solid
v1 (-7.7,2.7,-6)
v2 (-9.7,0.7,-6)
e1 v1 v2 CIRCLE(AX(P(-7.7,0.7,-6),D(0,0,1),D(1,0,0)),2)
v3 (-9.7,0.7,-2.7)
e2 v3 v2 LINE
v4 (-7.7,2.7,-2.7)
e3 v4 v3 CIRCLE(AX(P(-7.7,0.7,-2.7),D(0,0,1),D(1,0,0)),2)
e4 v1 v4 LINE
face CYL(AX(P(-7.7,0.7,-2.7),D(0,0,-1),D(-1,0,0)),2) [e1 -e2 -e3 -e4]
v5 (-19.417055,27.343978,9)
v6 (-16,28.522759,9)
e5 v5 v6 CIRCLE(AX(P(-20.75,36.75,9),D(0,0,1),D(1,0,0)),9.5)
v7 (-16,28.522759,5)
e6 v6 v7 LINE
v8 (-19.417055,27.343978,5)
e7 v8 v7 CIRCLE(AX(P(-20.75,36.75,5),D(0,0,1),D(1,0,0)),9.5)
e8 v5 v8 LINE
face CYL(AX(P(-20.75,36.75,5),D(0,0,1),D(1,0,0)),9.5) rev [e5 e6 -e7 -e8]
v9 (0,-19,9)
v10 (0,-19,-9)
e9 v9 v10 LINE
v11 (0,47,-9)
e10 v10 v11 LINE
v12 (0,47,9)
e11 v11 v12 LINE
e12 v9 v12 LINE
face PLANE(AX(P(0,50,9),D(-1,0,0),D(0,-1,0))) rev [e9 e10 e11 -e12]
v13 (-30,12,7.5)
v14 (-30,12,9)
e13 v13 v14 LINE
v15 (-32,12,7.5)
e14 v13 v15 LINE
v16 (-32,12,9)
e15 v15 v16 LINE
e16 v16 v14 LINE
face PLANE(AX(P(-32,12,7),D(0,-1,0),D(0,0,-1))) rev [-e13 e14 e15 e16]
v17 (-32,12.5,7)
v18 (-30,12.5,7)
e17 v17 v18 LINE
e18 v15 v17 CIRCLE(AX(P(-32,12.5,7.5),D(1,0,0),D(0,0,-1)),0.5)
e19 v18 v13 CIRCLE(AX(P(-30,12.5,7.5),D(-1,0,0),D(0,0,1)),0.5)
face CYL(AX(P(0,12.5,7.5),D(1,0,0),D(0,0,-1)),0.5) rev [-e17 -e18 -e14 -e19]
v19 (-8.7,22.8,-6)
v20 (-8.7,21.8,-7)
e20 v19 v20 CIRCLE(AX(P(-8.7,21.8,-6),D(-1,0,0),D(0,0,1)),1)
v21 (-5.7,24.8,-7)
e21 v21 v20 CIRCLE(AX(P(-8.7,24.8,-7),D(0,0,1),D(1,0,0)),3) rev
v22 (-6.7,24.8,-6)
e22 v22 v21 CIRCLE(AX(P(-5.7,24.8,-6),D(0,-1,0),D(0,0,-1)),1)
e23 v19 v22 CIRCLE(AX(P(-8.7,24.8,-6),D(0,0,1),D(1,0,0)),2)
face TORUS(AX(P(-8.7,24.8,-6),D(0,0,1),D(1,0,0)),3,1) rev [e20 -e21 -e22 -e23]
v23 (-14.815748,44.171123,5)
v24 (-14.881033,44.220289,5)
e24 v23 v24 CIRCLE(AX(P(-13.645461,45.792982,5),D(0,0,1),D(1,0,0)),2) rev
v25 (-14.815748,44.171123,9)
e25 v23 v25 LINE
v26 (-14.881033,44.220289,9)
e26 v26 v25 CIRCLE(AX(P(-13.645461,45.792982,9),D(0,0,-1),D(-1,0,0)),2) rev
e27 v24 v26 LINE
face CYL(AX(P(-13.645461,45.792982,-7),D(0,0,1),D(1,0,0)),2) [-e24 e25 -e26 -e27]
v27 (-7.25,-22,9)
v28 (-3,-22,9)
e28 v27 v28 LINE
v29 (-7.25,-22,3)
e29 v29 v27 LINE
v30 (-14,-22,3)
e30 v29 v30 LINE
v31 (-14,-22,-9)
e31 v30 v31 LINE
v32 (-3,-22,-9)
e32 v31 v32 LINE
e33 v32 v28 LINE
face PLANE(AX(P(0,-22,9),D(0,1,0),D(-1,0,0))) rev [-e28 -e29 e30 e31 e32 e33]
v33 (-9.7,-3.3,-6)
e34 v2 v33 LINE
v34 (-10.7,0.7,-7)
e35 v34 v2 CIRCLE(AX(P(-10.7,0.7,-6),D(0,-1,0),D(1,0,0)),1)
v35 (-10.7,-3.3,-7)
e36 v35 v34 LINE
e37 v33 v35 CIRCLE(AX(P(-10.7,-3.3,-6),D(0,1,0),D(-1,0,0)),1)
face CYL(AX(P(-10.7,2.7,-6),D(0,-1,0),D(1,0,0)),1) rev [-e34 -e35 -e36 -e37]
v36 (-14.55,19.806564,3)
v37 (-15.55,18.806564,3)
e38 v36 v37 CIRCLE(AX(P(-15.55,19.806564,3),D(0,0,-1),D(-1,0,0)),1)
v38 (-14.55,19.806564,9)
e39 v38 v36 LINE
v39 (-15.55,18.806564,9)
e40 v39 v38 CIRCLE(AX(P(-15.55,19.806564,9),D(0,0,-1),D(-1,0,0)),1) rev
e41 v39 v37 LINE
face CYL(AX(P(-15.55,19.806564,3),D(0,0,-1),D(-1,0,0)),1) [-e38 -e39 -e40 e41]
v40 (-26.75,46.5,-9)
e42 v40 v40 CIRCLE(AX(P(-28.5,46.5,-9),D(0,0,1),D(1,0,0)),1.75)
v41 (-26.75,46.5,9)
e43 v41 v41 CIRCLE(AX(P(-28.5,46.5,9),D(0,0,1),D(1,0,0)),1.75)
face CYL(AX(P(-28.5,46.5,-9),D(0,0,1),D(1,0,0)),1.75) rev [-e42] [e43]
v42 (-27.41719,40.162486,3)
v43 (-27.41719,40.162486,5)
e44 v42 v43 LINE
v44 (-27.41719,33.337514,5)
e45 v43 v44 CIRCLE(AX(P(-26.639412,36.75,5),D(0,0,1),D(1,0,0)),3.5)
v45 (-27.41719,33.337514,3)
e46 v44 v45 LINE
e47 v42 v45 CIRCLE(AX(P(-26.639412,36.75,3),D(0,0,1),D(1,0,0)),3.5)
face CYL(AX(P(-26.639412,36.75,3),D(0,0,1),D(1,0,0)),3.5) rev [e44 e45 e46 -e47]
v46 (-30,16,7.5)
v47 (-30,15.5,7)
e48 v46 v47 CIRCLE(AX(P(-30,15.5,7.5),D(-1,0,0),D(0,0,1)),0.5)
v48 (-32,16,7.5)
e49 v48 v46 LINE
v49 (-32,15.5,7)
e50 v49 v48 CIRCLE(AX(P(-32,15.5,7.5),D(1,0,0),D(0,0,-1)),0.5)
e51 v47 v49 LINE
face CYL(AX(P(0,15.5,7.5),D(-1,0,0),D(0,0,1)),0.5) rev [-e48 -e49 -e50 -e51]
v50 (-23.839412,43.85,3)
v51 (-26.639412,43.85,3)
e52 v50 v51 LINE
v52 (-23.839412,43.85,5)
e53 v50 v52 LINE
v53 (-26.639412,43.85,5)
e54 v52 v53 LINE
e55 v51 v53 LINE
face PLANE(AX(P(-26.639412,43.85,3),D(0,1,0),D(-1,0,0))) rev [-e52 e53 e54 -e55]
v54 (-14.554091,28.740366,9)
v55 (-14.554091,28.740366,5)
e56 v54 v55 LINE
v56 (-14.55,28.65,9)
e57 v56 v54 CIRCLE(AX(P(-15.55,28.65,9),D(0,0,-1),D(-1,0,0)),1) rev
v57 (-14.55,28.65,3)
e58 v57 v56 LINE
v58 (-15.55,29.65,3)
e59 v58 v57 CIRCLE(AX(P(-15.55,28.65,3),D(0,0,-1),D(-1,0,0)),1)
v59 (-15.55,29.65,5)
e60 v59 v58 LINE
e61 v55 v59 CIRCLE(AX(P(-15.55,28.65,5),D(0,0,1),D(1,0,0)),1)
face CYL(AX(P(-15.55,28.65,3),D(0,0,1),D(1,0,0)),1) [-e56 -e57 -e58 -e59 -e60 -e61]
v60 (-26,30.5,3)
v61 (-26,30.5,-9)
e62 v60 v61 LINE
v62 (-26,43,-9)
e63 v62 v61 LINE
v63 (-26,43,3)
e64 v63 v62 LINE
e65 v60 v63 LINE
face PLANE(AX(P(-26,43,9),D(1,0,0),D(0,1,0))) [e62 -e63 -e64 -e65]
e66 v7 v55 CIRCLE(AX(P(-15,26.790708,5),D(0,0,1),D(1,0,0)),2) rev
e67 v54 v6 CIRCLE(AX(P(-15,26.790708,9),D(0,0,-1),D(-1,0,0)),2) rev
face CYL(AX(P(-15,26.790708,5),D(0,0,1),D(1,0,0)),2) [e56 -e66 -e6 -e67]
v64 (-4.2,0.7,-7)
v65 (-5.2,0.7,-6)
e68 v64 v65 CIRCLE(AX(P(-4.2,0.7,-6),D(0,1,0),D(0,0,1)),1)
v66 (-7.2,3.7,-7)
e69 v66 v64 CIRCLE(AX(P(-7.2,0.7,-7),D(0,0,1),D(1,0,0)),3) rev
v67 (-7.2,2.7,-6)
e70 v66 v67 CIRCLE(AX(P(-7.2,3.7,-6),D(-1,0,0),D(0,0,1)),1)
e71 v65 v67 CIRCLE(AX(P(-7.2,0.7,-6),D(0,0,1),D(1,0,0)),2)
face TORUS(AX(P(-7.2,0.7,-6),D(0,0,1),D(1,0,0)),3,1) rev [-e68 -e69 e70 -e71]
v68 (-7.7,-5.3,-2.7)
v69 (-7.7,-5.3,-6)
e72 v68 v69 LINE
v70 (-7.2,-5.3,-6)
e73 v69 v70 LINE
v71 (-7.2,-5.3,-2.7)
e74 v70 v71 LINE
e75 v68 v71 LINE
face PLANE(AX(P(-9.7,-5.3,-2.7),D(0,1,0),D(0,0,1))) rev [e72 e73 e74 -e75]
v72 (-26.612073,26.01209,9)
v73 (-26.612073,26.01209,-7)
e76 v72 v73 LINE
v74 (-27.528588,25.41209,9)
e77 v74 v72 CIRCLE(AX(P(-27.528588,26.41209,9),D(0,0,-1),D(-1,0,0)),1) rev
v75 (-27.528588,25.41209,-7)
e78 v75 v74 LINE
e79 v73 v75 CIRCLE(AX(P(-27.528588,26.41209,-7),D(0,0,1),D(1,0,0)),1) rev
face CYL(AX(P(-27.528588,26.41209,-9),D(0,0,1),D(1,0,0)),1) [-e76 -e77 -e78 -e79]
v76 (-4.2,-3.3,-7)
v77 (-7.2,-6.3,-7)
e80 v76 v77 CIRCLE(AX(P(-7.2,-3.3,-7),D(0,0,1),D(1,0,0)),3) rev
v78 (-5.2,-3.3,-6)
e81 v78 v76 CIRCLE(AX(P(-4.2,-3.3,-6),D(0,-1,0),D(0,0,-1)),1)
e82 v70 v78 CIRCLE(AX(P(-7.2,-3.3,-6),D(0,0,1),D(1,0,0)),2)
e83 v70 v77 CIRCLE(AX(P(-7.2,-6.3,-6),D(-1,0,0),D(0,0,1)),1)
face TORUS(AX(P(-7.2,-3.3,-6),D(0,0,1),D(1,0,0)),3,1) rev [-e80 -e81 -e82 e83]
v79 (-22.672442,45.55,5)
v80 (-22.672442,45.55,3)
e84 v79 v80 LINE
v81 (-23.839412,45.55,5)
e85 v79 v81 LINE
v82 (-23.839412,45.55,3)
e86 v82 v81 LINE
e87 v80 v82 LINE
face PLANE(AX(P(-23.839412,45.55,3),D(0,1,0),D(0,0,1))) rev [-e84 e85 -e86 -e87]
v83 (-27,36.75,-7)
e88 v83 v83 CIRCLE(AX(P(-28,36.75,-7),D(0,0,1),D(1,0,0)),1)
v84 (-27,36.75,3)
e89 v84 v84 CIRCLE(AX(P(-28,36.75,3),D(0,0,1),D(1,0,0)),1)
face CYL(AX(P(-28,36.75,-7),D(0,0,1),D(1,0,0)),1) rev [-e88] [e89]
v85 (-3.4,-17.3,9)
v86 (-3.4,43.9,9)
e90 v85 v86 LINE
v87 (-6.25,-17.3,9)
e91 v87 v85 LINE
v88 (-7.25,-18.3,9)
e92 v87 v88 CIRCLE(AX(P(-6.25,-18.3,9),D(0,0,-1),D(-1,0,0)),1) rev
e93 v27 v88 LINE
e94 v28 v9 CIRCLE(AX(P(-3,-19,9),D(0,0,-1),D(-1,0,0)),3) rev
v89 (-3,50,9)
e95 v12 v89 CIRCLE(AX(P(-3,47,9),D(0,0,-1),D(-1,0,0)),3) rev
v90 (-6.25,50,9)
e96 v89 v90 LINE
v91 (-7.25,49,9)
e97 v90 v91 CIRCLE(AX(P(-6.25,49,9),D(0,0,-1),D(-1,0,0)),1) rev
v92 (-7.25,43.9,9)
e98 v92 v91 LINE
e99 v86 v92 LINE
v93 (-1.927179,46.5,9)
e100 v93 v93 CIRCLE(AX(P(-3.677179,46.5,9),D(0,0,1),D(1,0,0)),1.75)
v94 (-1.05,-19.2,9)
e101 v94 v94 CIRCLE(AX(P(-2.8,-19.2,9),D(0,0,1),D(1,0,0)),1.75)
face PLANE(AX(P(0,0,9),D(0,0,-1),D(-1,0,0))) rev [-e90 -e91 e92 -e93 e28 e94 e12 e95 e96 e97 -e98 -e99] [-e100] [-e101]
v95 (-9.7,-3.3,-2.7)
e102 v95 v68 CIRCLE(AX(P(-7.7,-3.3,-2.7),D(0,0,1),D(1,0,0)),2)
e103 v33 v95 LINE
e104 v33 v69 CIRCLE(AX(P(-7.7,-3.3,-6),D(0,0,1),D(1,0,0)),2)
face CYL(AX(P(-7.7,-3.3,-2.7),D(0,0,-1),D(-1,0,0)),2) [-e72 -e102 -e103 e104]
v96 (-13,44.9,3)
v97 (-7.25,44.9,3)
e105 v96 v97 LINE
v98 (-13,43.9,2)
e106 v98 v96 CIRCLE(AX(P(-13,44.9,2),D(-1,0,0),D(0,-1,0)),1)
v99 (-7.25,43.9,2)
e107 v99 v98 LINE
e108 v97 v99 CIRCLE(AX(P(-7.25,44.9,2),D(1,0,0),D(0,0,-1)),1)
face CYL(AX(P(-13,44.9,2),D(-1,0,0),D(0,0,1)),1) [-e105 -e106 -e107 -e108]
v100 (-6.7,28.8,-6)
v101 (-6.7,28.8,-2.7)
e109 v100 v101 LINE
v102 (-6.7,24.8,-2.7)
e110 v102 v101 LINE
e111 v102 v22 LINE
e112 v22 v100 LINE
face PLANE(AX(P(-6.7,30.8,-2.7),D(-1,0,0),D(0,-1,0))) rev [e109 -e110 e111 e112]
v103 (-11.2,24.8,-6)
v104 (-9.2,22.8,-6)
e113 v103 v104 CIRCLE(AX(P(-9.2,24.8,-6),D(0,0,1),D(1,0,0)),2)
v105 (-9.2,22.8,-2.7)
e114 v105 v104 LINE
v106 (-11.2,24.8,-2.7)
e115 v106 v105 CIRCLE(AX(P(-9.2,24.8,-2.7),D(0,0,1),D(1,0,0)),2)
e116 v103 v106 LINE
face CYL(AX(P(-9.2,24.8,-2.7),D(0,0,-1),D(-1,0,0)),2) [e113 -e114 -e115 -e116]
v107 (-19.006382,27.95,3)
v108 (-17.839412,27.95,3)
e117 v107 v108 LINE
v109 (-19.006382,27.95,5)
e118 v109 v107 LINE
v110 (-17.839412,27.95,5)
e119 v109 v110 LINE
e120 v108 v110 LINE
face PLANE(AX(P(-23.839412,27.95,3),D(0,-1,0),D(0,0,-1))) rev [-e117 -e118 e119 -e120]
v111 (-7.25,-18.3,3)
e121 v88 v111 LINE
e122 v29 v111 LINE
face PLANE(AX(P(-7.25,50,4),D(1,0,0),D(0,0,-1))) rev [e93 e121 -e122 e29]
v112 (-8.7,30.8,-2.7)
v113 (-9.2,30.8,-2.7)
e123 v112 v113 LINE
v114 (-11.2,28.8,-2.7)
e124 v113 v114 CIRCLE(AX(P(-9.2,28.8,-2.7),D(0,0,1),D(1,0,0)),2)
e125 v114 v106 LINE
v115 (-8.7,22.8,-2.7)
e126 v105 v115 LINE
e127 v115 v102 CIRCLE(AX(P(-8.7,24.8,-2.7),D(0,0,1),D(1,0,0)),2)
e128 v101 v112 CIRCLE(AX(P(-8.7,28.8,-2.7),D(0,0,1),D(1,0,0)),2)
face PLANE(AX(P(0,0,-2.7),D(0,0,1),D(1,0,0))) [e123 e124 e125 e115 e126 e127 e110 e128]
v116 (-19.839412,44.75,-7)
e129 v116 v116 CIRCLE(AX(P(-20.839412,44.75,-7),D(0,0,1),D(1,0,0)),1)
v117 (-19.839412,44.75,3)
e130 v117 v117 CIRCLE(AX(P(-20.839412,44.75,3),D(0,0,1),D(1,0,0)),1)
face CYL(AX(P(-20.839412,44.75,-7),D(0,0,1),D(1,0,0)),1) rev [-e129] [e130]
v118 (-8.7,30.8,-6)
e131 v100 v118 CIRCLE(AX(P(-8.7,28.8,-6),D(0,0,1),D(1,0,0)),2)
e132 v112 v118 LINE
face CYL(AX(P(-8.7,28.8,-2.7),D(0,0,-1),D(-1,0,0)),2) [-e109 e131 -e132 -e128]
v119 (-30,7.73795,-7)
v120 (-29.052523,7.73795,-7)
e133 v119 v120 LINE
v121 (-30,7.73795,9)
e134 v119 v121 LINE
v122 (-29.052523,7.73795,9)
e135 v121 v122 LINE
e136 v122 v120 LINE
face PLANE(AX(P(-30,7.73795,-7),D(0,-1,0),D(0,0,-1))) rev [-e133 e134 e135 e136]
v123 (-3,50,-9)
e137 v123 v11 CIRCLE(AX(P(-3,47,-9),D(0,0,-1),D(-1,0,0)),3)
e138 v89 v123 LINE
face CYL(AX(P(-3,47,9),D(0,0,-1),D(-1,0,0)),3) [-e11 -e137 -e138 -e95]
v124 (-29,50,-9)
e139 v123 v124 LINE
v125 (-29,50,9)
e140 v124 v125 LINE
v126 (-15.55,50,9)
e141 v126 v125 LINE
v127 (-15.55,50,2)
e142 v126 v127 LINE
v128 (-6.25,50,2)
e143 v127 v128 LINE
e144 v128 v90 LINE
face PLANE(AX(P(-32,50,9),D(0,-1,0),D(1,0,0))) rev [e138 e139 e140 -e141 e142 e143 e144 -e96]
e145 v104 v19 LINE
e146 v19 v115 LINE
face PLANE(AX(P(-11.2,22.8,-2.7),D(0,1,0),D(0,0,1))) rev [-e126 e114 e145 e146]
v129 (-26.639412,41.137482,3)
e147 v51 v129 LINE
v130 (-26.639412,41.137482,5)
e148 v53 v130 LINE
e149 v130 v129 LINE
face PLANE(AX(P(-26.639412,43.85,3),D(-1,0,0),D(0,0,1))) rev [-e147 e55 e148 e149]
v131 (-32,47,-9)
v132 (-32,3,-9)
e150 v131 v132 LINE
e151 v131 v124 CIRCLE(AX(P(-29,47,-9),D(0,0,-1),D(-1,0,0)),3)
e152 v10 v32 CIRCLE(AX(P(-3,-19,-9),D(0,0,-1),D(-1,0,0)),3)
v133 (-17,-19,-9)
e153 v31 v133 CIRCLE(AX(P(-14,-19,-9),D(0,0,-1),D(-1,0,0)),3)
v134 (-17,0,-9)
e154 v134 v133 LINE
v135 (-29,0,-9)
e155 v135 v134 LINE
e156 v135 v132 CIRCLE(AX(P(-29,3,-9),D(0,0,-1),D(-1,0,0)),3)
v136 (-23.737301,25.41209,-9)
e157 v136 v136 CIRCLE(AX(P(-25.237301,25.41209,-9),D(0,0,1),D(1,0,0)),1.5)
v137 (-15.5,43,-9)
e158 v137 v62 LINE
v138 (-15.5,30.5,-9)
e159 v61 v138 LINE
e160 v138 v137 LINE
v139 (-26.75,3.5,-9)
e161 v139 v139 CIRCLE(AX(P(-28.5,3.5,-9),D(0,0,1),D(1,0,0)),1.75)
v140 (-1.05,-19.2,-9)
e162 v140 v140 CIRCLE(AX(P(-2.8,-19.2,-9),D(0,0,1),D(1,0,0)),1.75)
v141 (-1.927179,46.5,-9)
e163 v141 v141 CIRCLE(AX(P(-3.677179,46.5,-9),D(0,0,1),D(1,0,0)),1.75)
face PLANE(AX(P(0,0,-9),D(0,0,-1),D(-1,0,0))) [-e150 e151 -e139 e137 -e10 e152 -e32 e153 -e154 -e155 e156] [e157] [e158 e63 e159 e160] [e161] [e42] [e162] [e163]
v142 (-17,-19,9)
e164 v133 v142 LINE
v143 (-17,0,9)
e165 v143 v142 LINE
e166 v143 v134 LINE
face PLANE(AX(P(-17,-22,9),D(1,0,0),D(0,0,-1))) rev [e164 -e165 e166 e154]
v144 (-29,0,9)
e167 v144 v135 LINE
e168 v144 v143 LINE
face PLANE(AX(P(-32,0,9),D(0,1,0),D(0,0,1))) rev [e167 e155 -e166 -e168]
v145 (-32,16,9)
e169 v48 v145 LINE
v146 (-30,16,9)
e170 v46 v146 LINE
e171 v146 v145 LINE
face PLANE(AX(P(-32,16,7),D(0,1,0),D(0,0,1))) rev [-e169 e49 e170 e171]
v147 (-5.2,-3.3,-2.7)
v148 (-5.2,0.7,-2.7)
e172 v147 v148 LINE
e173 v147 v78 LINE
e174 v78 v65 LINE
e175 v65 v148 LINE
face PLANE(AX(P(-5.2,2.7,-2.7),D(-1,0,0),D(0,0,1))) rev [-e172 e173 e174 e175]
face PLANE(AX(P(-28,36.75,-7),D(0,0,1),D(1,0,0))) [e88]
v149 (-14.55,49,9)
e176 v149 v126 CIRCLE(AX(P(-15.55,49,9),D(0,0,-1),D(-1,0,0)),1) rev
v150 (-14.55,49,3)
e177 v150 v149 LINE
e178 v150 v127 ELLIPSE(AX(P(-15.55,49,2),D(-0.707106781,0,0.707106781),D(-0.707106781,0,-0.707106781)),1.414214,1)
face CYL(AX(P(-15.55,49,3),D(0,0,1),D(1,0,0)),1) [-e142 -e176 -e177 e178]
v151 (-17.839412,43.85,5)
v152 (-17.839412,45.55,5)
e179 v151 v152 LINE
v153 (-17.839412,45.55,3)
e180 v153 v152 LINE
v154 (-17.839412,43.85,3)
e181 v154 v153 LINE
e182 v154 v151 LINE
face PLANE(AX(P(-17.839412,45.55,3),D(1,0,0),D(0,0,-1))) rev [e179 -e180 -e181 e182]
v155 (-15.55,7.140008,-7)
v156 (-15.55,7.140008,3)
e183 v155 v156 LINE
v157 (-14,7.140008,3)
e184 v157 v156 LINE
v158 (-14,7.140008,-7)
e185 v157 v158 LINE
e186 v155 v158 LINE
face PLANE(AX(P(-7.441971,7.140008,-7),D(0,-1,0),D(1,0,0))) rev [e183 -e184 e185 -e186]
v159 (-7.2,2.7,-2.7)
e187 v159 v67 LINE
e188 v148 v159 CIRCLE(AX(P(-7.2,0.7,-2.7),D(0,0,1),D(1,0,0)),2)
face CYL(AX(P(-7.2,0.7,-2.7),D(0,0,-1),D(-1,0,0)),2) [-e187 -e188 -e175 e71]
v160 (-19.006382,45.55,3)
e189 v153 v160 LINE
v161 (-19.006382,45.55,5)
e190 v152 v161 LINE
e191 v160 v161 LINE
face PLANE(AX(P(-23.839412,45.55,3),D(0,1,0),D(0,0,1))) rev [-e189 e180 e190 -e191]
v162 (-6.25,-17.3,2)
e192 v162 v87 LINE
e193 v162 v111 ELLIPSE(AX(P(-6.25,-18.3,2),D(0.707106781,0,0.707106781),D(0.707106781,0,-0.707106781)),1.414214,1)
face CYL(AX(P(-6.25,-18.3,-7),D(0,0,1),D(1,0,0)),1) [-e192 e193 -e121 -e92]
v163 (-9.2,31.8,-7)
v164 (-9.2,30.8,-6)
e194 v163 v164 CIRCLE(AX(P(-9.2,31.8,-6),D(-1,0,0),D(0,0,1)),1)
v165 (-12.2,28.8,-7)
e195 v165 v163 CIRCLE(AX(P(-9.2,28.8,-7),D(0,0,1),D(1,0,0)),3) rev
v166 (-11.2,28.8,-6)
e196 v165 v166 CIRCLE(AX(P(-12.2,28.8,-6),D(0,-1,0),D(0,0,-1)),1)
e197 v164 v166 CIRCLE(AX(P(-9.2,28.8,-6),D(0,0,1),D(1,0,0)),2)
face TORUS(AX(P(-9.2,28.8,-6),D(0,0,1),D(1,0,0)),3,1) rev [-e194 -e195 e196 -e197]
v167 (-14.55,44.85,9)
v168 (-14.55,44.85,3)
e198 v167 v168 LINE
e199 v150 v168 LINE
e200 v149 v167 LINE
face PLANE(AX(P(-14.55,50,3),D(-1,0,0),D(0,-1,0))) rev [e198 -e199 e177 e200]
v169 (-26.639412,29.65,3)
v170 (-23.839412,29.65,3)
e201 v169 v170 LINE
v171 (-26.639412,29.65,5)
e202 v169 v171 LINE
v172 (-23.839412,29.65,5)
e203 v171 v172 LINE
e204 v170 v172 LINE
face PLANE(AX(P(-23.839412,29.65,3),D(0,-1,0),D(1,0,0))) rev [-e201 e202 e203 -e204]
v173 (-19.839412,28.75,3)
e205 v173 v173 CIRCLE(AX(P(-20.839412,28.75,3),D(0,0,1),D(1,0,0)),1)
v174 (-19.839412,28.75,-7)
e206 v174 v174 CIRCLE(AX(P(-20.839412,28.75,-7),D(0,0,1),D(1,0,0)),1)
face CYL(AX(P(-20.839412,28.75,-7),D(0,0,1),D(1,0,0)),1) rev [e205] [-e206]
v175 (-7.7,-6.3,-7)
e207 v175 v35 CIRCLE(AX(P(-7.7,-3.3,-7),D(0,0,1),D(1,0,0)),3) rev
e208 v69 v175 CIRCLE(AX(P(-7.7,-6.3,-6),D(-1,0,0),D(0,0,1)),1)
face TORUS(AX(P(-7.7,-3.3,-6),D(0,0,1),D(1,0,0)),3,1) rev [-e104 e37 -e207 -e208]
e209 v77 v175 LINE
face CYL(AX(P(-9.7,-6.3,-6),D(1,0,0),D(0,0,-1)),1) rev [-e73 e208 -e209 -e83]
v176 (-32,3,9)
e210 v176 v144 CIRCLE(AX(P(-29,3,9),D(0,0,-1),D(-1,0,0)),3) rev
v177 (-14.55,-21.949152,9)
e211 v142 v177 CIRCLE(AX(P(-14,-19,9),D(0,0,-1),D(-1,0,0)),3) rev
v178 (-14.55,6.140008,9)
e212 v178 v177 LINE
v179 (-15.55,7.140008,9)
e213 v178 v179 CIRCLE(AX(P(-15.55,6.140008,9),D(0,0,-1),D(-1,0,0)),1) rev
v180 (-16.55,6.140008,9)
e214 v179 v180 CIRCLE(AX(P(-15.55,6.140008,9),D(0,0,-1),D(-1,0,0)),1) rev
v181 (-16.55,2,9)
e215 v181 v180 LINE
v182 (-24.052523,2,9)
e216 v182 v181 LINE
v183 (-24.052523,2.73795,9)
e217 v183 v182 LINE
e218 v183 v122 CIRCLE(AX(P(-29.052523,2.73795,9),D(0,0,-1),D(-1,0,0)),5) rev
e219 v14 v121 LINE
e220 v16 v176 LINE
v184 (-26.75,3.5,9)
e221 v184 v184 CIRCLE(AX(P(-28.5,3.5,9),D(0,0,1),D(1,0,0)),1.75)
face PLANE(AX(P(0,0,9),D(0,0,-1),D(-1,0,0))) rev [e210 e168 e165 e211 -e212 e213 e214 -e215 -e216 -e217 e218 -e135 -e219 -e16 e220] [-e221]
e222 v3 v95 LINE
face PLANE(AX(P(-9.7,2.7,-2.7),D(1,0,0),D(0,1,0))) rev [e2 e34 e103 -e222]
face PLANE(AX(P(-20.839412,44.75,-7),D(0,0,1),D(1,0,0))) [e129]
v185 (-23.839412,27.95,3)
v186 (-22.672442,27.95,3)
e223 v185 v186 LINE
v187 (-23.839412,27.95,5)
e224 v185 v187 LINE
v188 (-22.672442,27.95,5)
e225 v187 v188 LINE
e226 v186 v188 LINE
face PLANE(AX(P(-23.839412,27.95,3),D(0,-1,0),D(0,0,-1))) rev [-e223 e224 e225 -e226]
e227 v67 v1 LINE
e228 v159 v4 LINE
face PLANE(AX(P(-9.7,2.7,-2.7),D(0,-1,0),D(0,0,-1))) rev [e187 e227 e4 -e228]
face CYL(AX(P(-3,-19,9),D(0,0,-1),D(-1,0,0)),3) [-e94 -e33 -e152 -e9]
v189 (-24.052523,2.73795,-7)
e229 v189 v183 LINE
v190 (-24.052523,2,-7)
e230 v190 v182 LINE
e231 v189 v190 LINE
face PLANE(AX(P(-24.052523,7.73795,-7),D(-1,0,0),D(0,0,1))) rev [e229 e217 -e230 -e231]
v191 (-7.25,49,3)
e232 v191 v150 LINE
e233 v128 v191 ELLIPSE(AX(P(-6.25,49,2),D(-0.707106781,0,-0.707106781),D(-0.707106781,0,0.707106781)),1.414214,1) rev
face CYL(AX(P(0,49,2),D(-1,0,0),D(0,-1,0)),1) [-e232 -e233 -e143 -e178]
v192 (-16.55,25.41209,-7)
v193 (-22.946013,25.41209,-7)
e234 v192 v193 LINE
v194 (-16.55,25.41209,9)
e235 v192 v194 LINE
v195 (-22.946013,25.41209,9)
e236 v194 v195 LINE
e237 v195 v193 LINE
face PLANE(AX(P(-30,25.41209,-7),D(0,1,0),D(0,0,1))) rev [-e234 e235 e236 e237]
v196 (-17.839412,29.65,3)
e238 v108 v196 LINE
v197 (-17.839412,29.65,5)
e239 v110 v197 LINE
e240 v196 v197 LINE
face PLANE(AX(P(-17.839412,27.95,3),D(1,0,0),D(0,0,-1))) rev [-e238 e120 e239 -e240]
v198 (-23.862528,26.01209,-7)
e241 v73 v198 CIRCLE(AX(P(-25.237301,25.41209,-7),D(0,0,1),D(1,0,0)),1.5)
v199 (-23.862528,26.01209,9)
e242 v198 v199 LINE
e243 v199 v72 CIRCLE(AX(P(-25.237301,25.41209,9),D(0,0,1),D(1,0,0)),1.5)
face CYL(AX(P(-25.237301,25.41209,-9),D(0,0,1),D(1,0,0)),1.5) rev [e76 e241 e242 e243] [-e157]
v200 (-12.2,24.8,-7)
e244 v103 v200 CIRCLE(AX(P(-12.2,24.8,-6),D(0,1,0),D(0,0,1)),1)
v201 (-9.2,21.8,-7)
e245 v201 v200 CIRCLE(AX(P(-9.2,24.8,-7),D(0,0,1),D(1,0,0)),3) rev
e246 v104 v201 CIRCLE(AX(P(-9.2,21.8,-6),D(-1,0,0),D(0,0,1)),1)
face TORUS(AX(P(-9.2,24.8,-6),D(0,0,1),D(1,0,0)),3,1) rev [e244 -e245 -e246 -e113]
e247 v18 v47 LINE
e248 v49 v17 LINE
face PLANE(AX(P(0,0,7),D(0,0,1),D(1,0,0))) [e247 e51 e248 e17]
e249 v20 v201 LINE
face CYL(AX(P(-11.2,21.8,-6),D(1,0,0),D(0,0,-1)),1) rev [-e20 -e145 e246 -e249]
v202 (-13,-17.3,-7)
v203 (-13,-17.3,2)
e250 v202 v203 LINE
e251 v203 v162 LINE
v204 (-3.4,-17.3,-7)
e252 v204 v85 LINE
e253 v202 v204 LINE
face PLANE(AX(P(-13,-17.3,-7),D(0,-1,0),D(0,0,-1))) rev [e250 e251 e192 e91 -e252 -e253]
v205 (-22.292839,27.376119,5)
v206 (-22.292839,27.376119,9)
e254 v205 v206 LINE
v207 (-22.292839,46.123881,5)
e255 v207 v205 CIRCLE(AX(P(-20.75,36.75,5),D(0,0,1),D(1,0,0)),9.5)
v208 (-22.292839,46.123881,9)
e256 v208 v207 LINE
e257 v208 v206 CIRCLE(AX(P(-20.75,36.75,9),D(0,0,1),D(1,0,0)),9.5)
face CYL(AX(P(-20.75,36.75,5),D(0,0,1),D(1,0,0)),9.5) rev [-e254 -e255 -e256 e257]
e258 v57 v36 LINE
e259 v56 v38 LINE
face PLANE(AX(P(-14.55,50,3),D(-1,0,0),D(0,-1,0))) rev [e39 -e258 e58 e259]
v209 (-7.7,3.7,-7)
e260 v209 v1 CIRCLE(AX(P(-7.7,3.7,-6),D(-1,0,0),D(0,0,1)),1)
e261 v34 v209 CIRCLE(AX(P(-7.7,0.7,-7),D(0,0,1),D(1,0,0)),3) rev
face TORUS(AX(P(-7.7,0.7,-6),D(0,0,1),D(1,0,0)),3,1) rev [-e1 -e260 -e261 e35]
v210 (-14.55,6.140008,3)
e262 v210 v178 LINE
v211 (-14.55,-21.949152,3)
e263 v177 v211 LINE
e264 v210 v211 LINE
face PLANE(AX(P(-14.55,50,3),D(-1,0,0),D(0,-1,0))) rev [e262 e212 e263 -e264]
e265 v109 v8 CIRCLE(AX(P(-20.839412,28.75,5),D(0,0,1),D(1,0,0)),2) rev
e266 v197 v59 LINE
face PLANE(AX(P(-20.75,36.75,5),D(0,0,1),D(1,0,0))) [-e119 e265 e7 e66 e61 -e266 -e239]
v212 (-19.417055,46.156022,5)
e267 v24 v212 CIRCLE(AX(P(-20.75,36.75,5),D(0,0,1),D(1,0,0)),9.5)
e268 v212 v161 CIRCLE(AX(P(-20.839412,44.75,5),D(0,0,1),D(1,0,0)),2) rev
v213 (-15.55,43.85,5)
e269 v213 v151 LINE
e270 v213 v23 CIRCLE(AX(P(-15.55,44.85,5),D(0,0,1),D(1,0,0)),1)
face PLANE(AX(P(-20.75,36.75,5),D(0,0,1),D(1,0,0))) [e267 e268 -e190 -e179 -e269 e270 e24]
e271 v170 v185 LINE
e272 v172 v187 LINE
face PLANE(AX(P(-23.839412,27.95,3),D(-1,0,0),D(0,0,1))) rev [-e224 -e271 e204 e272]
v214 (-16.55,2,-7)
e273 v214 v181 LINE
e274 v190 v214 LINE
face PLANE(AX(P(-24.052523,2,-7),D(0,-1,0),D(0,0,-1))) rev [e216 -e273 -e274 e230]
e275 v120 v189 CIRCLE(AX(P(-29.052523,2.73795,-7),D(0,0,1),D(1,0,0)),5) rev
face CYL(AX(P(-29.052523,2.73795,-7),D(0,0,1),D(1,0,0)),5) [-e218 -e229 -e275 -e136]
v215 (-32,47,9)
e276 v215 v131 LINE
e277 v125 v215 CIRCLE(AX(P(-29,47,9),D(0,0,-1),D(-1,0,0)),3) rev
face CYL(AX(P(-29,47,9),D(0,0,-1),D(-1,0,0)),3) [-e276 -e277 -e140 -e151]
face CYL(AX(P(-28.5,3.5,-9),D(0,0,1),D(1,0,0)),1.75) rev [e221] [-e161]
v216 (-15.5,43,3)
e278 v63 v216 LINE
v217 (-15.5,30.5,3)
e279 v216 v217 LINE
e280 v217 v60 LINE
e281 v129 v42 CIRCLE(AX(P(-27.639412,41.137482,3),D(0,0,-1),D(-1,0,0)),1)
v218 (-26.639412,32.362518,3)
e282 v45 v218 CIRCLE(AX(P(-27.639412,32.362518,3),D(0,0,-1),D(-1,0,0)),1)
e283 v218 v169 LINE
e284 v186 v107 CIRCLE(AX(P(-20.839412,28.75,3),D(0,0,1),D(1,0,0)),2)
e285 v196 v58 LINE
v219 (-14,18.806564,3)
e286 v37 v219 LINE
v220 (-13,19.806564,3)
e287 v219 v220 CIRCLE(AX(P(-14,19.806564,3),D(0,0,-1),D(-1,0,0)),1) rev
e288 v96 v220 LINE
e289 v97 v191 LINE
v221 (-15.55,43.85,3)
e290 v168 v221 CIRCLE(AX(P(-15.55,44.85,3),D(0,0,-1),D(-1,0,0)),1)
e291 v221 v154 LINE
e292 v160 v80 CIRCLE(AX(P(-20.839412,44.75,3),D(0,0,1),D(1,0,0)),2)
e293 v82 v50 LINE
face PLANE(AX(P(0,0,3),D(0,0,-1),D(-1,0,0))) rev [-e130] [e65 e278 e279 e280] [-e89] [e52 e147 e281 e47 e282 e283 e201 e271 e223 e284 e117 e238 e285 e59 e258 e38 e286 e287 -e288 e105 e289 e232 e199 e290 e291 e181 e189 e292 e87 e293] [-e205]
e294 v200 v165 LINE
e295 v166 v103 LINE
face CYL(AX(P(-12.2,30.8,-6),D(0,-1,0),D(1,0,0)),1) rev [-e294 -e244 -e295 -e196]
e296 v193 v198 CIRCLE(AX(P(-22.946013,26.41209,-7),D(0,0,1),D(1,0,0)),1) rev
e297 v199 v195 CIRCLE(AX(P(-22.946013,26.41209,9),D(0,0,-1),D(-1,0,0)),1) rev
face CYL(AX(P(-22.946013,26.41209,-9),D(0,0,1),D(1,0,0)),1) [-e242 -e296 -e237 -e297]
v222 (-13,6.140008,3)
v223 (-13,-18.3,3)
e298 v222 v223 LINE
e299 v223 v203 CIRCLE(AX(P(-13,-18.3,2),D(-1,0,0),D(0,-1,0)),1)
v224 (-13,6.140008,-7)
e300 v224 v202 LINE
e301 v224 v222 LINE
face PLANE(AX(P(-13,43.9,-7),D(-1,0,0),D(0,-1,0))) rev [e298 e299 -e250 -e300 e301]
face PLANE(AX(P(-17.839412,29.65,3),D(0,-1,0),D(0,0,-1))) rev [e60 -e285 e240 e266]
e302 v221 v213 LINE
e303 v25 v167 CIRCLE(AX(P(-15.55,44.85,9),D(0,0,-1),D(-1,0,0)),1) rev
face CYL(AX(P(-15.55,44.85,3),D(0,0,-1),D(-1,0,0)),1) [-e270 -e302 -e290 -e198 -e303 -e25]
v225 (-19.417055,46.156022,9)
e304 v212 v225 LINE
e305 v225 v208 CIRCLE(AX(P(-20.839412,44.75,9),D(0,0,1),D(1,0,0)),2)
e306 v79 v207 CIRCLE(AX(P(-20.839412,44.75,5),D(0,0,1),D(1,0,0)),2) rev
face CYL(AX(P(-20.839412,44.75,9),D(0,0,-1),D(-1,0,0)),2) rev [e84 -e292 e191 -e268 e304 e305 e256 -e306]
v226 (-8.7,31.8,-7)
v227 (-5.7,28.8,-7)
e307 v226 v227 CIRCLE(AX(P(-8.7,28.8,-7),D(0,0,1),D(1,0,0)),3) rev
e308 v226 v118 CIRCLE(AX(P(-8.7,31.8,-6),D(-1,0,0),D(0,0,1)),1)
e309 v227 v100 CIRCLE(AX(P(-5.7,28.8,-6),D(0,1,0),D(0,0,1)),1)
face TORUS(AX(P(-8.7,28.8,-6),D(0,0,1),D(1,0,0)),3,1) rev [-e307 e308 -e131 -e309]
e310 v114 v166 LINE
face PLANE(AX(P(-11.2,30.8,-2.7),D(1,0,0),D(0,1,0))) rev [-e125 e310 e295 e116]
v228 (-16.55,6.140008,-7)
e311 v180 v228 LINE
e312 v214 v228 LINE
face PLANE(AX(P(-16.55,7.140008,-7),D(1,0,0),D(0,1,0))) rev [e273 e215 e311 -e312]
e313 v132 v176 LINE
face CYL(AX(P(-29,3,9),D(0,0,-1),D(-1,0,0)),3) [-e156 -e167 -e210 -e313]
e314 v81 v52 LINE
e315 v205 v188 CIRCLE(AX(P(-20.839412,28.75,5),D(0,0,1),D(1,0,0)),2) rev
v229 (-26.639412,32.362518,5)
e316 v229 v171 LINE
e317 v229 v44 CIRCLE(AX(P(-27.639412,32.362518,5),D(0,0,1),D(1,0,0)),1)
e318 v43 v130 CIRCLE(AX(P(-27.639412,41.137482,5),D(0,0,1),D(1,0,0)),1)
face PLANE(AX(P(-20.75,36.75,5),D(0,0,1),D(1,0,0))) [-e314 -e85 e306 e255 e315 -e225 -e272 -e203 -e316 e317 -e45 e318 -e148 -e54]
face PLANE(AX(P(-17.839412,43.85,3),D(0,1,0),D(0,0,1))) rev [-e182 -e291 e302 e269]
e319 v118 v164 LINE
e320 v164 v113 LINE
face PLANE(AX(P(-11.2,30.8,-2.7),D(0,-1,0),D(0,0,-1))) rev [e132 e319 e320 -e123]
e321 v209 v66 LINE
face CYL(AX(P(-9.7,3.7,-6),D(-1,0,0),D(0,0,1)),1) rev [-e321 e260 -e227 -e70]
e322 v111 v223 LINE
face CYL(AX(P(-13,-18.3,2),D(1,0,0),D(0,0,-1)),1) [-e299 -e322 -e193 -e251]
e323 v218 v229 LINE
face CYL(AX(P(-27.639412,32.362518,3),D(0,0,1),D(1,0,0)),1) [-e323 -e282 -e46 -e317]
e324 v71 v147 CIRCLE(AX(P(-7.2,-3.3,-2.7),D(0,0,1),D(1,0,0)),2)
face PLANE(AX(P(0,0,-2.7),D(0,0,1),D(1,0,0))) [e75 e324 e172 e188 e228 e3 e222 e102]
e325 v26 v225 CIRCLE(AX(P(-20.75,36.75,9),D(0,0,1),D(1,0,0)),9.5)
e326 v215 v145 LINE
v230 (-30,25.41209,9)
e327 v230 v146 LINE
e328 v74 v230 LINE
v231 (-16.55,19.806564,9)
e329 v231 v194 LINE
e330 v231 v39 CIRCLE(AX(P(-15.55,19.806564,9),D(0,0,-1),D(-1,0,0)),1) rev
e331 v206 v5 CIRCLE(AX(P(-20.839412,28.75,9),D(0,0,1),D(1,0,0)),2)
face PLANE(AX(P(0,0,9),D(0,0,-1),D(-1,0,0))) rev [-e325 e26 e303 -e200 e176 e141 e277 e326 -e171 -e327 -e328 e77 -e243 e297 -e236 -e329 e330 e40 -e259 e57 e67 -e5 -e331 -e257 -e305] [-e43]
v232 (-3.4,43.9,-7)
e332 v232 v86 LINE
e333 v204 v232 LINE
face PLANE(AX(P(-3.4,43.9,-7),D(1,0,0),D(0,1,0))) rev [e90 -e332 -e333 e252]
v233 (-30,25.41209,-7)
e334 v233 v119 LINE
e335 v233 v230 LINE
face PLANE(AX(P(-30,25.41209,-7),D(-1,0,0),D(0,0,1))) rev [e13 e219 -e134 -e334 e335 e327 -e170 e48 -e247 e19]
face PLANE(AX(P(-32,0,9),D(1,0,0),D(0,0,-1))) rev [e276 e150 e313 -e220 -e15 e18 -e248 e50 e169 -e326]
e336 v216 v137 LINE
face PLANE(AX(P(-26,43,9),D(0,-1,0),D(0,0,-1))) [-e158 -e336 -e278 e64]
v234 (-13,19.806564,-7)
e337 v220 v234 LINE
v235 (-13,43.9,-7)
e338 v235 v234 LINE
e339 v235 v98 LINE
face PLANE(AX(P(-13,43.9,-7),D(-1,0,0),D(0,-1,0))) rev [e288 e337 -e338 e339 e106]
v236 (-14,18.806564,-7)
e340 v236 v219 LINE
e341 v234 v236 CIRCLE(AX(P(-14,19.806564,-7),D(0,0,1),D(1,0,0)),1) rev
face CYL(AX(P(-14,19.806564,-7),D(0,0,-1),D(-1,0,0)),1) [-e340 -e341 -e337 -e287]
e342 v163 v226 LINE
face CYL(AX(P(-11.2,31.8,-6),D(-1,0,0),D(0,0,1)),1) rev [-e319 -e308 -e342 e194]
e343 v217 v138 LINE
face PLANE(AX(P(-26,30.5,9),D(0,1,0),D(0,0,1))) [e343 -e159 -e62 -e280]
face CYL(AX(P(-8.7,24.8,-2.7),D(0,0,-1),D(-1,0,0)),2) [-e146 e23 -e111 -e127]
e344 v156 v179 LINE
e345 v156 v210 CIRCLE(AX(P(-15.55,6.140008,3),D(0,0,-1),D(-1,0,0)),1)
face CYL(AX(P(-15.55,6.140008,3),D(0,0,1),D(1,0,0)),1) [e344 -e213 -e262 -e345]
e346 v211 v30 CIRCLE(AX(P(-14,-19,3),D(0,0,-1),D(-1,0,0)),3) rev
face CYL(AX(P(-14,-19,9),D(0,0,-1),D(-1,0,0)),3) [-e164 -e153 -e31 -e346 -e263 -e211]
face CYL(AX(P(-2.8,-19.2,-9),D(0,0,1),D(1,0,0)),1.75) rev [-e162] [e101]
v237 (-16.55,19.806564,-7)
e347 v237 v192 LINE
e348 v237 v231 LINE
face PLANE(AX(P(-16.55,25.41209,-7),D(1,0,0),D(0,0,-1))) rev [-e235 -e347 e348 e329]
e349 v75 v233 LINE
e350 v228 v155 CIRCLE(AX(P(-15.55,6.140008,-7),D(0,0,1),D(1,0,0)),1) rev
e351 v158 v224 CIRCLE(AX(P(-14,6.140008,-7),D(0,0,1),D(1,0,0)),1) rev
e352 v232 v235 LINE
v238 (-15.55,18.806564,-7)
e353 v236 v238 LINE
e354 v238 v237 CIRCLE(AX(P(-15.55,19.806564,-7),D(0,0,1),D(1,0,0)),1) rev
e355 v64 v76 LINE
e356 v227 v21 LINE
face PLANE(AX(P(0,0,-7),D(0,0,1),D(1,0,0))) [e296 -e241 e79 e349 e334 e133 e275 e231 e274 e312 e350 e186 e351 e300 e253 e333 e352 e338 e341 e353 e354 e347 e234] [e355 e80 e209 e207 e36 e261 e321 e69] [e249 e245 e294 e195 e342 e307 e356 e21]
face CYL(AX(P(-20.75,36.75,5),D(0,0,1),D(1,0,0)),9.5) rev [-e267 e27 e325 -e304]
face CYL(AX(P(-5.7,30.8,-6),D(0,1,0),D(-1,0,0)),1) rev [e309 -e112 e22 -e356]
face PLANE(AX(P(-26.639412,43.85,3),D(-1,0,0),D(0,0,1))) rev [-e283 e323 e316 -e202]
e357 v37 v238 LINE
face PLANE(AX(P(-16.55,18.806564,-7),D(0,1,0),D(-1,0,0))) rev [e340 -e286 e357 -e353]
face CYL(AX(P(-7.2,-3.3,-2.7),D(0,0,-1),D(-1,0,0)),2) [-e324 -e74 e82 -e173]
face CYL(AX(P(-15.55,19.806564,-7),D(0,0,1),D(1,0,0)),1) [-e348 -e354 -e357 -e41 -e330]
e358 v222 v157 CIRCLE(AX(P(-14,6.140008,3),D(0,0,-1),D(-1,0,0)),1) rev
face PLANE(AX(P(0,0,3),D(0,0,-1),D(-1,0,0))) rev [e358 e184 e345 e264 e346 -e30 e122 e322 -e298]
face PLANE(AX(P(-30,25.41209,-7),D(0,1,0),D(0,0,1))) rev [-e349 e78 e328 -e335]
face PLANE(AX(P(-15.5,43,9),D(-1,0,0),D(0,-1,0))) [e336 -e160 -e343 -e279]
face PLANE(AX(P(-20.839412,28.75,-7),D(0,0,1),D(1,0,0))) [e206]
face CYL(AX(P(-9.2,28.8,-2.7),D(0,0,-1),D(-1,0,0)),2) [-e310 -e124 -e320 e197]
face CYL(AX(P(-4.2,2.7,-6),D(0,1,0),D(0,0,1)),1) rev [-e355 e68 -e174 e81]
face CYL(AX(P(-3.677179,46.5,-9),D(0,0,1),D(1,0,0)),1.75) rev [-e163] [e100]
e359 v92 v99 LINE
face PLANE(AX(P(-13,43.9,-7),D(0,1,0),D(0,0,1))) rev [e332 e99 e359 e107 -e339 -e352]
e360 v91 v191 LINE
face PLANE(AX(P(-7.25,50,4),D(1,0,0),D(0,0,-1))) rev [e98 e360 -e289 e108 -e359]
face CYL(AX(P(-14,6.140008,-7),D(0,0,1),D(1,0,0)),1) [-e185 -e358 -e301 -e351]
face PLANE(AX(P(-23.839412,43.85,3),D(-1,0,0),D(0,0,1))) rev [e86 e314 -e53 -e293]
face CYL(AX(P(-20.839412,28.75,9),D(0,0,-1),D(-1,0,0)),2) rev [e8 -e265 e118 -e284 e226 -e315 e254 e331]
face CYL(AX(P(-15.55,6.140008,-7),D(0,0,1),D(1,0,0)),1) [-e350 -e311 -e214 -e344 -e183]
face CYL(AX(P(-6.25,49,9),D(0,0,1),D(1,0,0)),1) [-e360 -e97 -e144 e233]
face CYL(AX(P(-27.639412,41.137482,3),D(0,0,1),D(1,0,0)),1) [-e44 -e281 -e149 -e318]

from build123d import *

# Parameters (mm, degrees)
BODY_SKETCH_W                        = 10.5
BODY_SKETCH_H                        = 12.5
BODY_DEPTH                           = 9
GEAR_BOX_R                           = 9.5
GEAR_PROFILE_DEPTH                   = 4
SCREWHOLE1_R                         = 1.75
SCREW1_DEPTH                         = 63.032249677
VERRUNDUNG2_R                        = 3
GLIDER_W                             = 9.6
GLIDER_H                             = 61.2
GLIDER_RUT_DEPTH                     = 16
VERRUNDUNG4_R                        = 2
HOLDER_OF_GLIDER_W                   = 4.5
HOLDER_OF_GLIDER_H                   = 8
GLIDER_HOLDER_DEPTH                  = 4.3
VERRUNDUNG5_R                        = 2
VERRUNDUNG6_R                        = 1
VERRUNDUNG7_R                        = 1
PINION_RUT_W                         = 4.5
PINION_RUT_H                         = 72
PINION_RUT_CUT_DEPTH                 = 5
VERRUNDUNG8_R                        = 2
SKETCH_PINION_CHANNEL_W              = 7.3
SKETCH_PINION_CHANNEL_H              = 75
PINION_CHANNEL_DEPTH                 = 6
VERRUNDUNG10_R                       = 1
VERRUNDUNG11_R                       = 1
MOTOR_HOLDER_DEPTH                   = 2
SKIZZE1_R                            = 1
MOTOR_SCREW_DEPTH                    = 10
SCHNITT_LINEAR_AUSTRAGEN2_DEPTH      = 61.991802728
SCHNITT_LINEAR_AUSTRAGEN2_DEPTH_BACK = 2
SKIZZE2_R                            = 2
SCHNITT_LINEAR_AUSTRAGEN3_DEPTH      = 2
VERRUNDUNG12_R                       = 1
VERRUNDUNG13_R                       = 1
LEFT_HOLE_R                          = 1
CENTER_HOLE_LEFT_DEPTH               = 10
ELECTRO_CAGE_DEPTH                   = 16
SKIZZE6_R                            = 1.5
SCHNITT_LINEAR_AUSTRAGEN5_DEPTH      = 18
SKIZZE7_R                            = 1.75
SCHNITT_LINEAR_AUSTRAGEN6_DEPTH      = 18
VERRUNDUNG14_R                       = 3
VERRUNDUNG15_R                       = 5
VERRUNDUNG16_R                       = 1
VERRUNDUNG17_R                       = 1
VERRUNDUNG18_R                       = 1
VERRUNDUNG19_R                       = 1
VERRUNDUNG20_R                       = 1
VERRUNDUNG21_R                       = 3
SKIZZE8_W                            = 2
SKIZZE8_H                            = 4
SCHNITT_LINEAR_AUSTRAGEN7_DEPTH      = 2
VERRUNDUNG22_R                       = 0.5


# Some blends are built 0.0001 mm under size
with BuildPart() as part:
    # body-sketch → body (new, symmetric)
    with BuildSketch(Plane.XY):
        Polygon((-32, 50), (0, 50), (0, -22), (-17, -22), (-17, 0), (-32, 0), align=None)
        with Locations((-20.75, 36.75)):
            Rectangle(BODY_SKETCH_W, BODY_SKETCH_H, mode=Mode.SUBTRACT)
    extrude(amount=BODY_DEPTH, both=True)

    # gear_box → gear_profile (cut)
    with BuildSketch(Plane.XY.offset(9)):
        with Locations((-20.75, 36.75)):
            Circle(GEAR_BOX_R)
    extrude(amount=-GEAR_PROFILE_DEPTH, mode=Mode.SUBTRACT)

    # screwhole1 → screw1 (cut, through all)
    with BuildSketch(Plane.XY.offset(9)):
        with Locations((-28.5, 46.5)):
            Circle(SCREWHOLE1_R)
        with Locations((-3.677178533, 46.5)):
            Circle(SCREWHOLE1_R)
        with Locations((-2.8, -19.2)):
            Circle(SCREWHOLE1_R)
    extrude(amount=-SCREW1_DEPTH, mode=Mode.SUBTRACT)

    # Verrundung2
    verrundung2_edges = [part.edges().sort_by_distance(p)[0] for p in [
        (-32, 50, 0),
        (0, 50, 0),
    ]]
    fillet(verrundung2_edges, radius=VERRUNDUNG2_R)

    # glider → glider_rut (cut)
    with BuildSketch(Plane.XY.offset(9)):
        with Locations((-8.2, 13.3)):
            Rectangle(GLIDER_W, GLIDER_H)
    extrude(amount=-GLIDER_RUT_DEPTH, mode=Mode.SUBTRACT)

    # Verrundung4
    verrundung4_edges = [part.edges().sort_by_distance(p)[0] for p in [
        (-13, 31.255684756, 7),
    ]]
    fillet(verrundung4_edges, radius=VERRUNDUNG4_R)

    # holder of glider → glider-holder (add)
    with BuildSketch(Plane.XY.offset(-7)):
        with Locations((-8.95, 26.8)):
            Rectangle(HOLDER_OF_GLIDER_W, HOLDER_OF_GLIDER_H)
        with Locations((-7.45, -1.3)):
            Rectangle(HOLDER_OF_GLIDER_W, HOLDER_OF_GLIDER_H)
    extrude(amount=GLIDER_HOLDER_DEPTH)

    # Verrundung5
    verrundung5_edges = [part.edges().sort_by_distance(p)[0] for p in [
        (-6.7, 22.8, -4.85),
        (-6.7, 30.8, -4.85),
        (-11.2, 30.8, -4.85),
        (-11.2, 22.8, -4.85),
        (-5.2, -5.3, -4.85),
        (-5.2, 2.7, -4.85),
        (-9.7, 2.7, -4.85),
        (-9.7, -5.3, -4.85),
    ]]
    fillet(verrundung5_edges, radius=VERRUNDUNG5_R)

    # Verrundung6
    verrundung6_edges = [part.edges().sort_by_distance(p)[0] for p in [
        (-11.2, 26.8, -7),
        (-8.95, 30.8, -7),
        (-6.7, 26.8, -7),
        (-8.95, 22.8, -7),
        (-10.614213562, 30.214213562, -7),
        (-7.285786438, 30.214213562, -7),
        (-7.285786438, 23.385786438, -7),
        (-10.614213562, 23.385786438, -7),
    ]]
    fillet(verrundung6_edges, radius=VERRUNDUNG6_R)

    # Verrundung7
    verrundung7_edges = [part.edges().sort_by_distance(p)[0] for p in [
        (-7.45, -5.3, -7),
        (-9.7, -1.3, -7),
        (-5.2, -1.3, -7),
        (-7.45, 2.7, -7),
        (-9.114213562, -4.714213562, -7),
        (-5.785786438, -4.714213562, -7),
        (-5.785786438, 2.114213562, -7),
        (-9.114213562, 2.114213562, -7),
    ]]
    fillet(verrundung7_edges, radius=VERRUNDUNG7_R)

    # Pinion rut → pinion rut cut (cut)
    with BuildSketch(Plane.XY.offset(9)):
        with Locations((-9.5, 14)):
            Rectangle(PINION_RUT_W, PINION_RUT_H)
    extrude(amount=-PINION_RUT_CUT_DEPTH, mode=Mode.SUBTRACT)

    # Verrundung8
    # the kernel refuses this fillet: 2 mm, written as the material it takes off along each edge
    with BuildSketch(Plane(origin=(-13, 42.244315244, 5), x_dir=(0, 1, 0), z_dir=(0, 0, 1))) as verrundung8_piece_1:
        with BuildLine():
            CenterArc((3.548666653, 0.645460718), VERRUNDUNG8_R, 141.845362101, 56.982763935)
            Line((1.975974149, 1.881032767), (1.944520299, 1.905744208))
            ThreePointArc((1.944520299, 1.905744208), (1.028281735, 0.89818793), (-0.023133959, 0.032631579))
            Line((-0.023133959, 0.032631579), (0, -0.04))
            ThreePointArc((0, -0.04), (0.827842378, -0.04), (1.617825118, -0.012909214))
            Line((1.617825118, -0.012909214), (1.655684756, 0))
        make_face()
    extrude(amount=10.820354696, mode=Mode.SUBTRACT)

    # sketch pinion channel → pinion channel (cut)
    with BuildSketch(Plane.XY.offset(9)):
        with Locations((-10.9, 12.5)):
            Rectangle(SKETCH_PINION_CHANNEL_W, SKETCH_PINION_CHANNEL_H)
    extrude(amount=-PINION_CHANNEL_DEPTH, mode=Mode.SUBTRACT)

    # Verrundung10
    verrundung10_edges = [part.edges().sort_by_distance(p)[0] for p in [
        (-7.25, -17.3, 6),
        (-7.25, 50, 6),
        (-14.55, 50, 6),
    ]]
    fillet(verrundung10_edges, radius=VERRUNDUNG10_R)

    # Verrundung11
    verrundung11_edges = [part.edges().sort_by_distance(p)[0] for p in [
        (-10.125, 43.9, 3),
        (-9.625, -17.3, 3),
        (-10.9, 50, 3),
    ]]
    fillet(verrundung11_edges, radius=VERRUNDUNG11_R)

    # motor-holder 2 → motor -holder (cut)
    with BuildSketch(Plane.XY.offset(5)):
        Polygon((-14.33941219, 43.85), (-14.33941219, 29.65), (-17.83941219, 29.65), (-17.83941219, 27.95), (-23.83941219, 27.95), (-23.83941219, 29.65), (-26.63941219, 29.65), (-26.63941219, 43.85), (-23.83941219, 43.85), (-23.83941219, 45.55), (-17.83941219, 45.55), (-17.83941219, 43.85), align=None)
    extrude(amount=-MOTOR_HOLDER_DEPTH, mode=Mode.SUBTRACT)

    # Skizze1 → motor-screw (cut)
    with BuildSketch(Plane.XY.offset(3)):
        with Locations((-20.83941219, 28.75)):
            Circle(SKIZZE1_R)
        with Locations((-20.83941219, 44.75)):
            Circle(SKIZZE1_R)
    extrude(amount=-MOTOR_SCREW_DEPTH, mode=Mode.SUBTRACT)

    # Skizze2 → Schnitt-Linear austragen2 (cut, two sides: drawn at the far end of the back side and taken through both)
    with BuildSketch(Plane.XY.offset(5).offset(-SCHNITT_LINEAR_AUSTRAGEN2_DEPTH_BACK)):
        with Locations((-20.83941219, 44.75)):
            Circle(SKIZZE2_R)
        with Locations((-20.83941219, 28.75)):
            Circle(SKIZZE2_R)
    extrude(amount=SCHNITT_LINEAR_AUSTRAGEN2_DEPTH + SCHNITT_LINEAR_AUSTRAGEN2_DEPTH_BACK, mode=Mode.SUBTRACT)

    # Skizze3 → Schnitt-Linear austragen3 (cut)
    with BuildSketch(Plane.XY.offset(5)):
        with BuildLine():
            Line((-26.63941219, 40.25), (-26.63941219, 33.25))
            ThreePointArc((-26.63941219, 33.25), (-30.13941219, 36.75), (-26.63941219, 40.25))
        make_face()
    extrude(amount=-SCHNITT_LINEAR_AUSTRAGEN3_DEPTH, mode=Mode.SUBTRACT)

    # Verrundung12
    verrundung12_edges = [part.edges().sort_by_distance(p)[0] for p in [
        (-14.55, 29.65, 4),
        (-14.55, 43.85, 4),
    ]]
    fillet(verrundung12_edges, radius=VERRUNDUNG12_R)

    # Verrundung13
    verrundung13_edges = [part.edges().sort_by_distance(p)[0] for p in [
        (-26.63941219, 33.25, 4),
        (-26.63941219, 40.25, 4),
    ]]
    fillet(verrundung13_edges, radius=VERRUNDUNG13_R)

    # left hole → center-hole-left (cut)
    with BuildSketch(Plane.XY.offset(3)):
        with Locations((-28, 36.75)):
            Circle(LEFT_HOLE_R)
    extrude(amount=-CENTER_HOLE_LEFT_DEPTH, mode=Mode.SUBTRACT)

    # cage → electro-cage (cut)
    with BuildSketch(Plane.XY.offset(9)):
        Polygon((-30, 25.412090366), (-30, 7.737950254), (-24.052522804, 7.737950254), (-24.052522804, 2), (-16.55, 2), (-16.55, 7.140007769), (-7.441971484, 7.140007769), (-7.441971484, 18.806564473), (-16.55, 18.806564473), (-16.55, 25.412090366), align=None)
    extrude(amount=-ELECTRO_CAGE_DEPTH, mode=Mode.SUBTRACT)

    # Skizze6 → Schnitt-Linear austragen5 (cut)
    with BuildSketch(Plane.XY.offset(9)):
        with Locations((-25.237300627, 25.412090366)):
            Circle(SKIZZE6_R)
    extrude(amount=-SCHNITT_LINEAR_AUSTRAGEN5_DEPTH, mode=Mode.SUBTRACT)

    # Skizze7 → Schnitt-Linear austragen6 (cut)
    with BuildSketch(Plane.XY.offset(9)):
        with Locations((-28.5, 3.5)):
            Circle(SKIZZE7_R)
    extrude(amount=-SCHNITT_LINEAR_AUSTRAGEN6_DEPTH, mode=Mode.SUBTRACT)

    # Verrundung14
    verrundung14_edges = [part.edges().sort_by_distance(p)[0] for p in [
        (-32, 0, 0),
    ]]
    fillet(verrundung14_edges, radius=VERRUNDUNG14_R)

    # Verrundung15
    verrundung15_edges = [part.edges().sort_by_distance(p)[0] for p in [
        (-24.052522804, 7.737950254, 1),
    ]]
    fillet(verrundung15_edges, radius=VERRUNDUNG15_R)

    # Verrundung16
    verrundung16_edges = [part.edges().sort_by_distance(p)[0] for p in [
        (-16.55, 18.806564473, 1),
    ]]
    fillet(verrundung16_edges, radius=VERRUNDUNG16_R)

    # Verrundung17
    verrundung17_edges = [part.edges().sort_by_distance(p)[0] for p in [
        (-16.55, 7.140007769, 1),
    ]]
    fillet(verrundung17_edges, radius=VERRUNDUNG17_R)

    # Verrundung18
    # the kernel refuses this fillet: 1 mm, written as the material it takes off along each edge
    with BuildSketch(Plane(origin=(-23.737300627, 25.412090366, 10.978219619), x_dir=(-0.20430964368921942, 0.9789063129307034, 0), z_dir=(0, 0, -1))) as verrundung18_piece_1:
        with BuildLine():
            CenterArc((0.817238575, 0.978906313), VERRUNDUNG18_R, 191.789089239, 66.421821522)
            Line((-0.161667738, 0.774596669), (0, 0))
            ThreePointArc((0, 0), (0.306464466, 0.031640531), (0.612928931, 0))
        make_face()
    extrude(amount=17.978219619, mode=Mode.SUBTRACT)

    # Verrundung19
    verrundung19_edges = [part.edges().sort_by_distance(p)[0] for p in [
        (-13, 18.806564473, -2),
        (-13, 7.140007769, -2),
        (-14.55, 7.140007769, 6),
        (-14.55, 18.806564473, 6),
    ]]
    fillet(verrundung19_edges, radius=VERRUNDUNG19_R - 0.0001)  # a hair under: the kernel refuses the full size

    # Verrundung20
    verrundung20_edges = [part.edges().sort_by_distance(p)[0] for p in [
        (-26.737300627, 25.412090366, 1),
    ]]
    fillet(verrundung20_edges, radius=VERRUNDUNG20_R)

    # Verrundung21
    verrundung21_edges = [part.edges().sort_by_distance(p)[0] for p in [
        (-17, -22, 0),
        (0, -22, 0),
    ]]
    fillet(verrundung21_edges, radius=VERRUNDUNG21_R)

    # Skizze8 → Schnitt-Linear austragen7 (cut)
    with BuildSketch(Plane.XY.offset(9)):
        with Locations((-31, 14)):
            Rectangle(SKIZZE8_W, SKIZZE8_H)
    extrude(amount=-SCHNITT_LINEAR_AUSTRAGEN7_DEPTH, mode=Mode.SUBTRACT)

    # Verrundung22
    verrundung22_edges = [part.edges().sort_by_distance(p)[0] for p in [
        (-31, 16, 7),
        (-31, 12, 7),
    ]]
    fillet(verrundung22_edges, radius=VERRUNDUNG22_R)


solid = part.part
